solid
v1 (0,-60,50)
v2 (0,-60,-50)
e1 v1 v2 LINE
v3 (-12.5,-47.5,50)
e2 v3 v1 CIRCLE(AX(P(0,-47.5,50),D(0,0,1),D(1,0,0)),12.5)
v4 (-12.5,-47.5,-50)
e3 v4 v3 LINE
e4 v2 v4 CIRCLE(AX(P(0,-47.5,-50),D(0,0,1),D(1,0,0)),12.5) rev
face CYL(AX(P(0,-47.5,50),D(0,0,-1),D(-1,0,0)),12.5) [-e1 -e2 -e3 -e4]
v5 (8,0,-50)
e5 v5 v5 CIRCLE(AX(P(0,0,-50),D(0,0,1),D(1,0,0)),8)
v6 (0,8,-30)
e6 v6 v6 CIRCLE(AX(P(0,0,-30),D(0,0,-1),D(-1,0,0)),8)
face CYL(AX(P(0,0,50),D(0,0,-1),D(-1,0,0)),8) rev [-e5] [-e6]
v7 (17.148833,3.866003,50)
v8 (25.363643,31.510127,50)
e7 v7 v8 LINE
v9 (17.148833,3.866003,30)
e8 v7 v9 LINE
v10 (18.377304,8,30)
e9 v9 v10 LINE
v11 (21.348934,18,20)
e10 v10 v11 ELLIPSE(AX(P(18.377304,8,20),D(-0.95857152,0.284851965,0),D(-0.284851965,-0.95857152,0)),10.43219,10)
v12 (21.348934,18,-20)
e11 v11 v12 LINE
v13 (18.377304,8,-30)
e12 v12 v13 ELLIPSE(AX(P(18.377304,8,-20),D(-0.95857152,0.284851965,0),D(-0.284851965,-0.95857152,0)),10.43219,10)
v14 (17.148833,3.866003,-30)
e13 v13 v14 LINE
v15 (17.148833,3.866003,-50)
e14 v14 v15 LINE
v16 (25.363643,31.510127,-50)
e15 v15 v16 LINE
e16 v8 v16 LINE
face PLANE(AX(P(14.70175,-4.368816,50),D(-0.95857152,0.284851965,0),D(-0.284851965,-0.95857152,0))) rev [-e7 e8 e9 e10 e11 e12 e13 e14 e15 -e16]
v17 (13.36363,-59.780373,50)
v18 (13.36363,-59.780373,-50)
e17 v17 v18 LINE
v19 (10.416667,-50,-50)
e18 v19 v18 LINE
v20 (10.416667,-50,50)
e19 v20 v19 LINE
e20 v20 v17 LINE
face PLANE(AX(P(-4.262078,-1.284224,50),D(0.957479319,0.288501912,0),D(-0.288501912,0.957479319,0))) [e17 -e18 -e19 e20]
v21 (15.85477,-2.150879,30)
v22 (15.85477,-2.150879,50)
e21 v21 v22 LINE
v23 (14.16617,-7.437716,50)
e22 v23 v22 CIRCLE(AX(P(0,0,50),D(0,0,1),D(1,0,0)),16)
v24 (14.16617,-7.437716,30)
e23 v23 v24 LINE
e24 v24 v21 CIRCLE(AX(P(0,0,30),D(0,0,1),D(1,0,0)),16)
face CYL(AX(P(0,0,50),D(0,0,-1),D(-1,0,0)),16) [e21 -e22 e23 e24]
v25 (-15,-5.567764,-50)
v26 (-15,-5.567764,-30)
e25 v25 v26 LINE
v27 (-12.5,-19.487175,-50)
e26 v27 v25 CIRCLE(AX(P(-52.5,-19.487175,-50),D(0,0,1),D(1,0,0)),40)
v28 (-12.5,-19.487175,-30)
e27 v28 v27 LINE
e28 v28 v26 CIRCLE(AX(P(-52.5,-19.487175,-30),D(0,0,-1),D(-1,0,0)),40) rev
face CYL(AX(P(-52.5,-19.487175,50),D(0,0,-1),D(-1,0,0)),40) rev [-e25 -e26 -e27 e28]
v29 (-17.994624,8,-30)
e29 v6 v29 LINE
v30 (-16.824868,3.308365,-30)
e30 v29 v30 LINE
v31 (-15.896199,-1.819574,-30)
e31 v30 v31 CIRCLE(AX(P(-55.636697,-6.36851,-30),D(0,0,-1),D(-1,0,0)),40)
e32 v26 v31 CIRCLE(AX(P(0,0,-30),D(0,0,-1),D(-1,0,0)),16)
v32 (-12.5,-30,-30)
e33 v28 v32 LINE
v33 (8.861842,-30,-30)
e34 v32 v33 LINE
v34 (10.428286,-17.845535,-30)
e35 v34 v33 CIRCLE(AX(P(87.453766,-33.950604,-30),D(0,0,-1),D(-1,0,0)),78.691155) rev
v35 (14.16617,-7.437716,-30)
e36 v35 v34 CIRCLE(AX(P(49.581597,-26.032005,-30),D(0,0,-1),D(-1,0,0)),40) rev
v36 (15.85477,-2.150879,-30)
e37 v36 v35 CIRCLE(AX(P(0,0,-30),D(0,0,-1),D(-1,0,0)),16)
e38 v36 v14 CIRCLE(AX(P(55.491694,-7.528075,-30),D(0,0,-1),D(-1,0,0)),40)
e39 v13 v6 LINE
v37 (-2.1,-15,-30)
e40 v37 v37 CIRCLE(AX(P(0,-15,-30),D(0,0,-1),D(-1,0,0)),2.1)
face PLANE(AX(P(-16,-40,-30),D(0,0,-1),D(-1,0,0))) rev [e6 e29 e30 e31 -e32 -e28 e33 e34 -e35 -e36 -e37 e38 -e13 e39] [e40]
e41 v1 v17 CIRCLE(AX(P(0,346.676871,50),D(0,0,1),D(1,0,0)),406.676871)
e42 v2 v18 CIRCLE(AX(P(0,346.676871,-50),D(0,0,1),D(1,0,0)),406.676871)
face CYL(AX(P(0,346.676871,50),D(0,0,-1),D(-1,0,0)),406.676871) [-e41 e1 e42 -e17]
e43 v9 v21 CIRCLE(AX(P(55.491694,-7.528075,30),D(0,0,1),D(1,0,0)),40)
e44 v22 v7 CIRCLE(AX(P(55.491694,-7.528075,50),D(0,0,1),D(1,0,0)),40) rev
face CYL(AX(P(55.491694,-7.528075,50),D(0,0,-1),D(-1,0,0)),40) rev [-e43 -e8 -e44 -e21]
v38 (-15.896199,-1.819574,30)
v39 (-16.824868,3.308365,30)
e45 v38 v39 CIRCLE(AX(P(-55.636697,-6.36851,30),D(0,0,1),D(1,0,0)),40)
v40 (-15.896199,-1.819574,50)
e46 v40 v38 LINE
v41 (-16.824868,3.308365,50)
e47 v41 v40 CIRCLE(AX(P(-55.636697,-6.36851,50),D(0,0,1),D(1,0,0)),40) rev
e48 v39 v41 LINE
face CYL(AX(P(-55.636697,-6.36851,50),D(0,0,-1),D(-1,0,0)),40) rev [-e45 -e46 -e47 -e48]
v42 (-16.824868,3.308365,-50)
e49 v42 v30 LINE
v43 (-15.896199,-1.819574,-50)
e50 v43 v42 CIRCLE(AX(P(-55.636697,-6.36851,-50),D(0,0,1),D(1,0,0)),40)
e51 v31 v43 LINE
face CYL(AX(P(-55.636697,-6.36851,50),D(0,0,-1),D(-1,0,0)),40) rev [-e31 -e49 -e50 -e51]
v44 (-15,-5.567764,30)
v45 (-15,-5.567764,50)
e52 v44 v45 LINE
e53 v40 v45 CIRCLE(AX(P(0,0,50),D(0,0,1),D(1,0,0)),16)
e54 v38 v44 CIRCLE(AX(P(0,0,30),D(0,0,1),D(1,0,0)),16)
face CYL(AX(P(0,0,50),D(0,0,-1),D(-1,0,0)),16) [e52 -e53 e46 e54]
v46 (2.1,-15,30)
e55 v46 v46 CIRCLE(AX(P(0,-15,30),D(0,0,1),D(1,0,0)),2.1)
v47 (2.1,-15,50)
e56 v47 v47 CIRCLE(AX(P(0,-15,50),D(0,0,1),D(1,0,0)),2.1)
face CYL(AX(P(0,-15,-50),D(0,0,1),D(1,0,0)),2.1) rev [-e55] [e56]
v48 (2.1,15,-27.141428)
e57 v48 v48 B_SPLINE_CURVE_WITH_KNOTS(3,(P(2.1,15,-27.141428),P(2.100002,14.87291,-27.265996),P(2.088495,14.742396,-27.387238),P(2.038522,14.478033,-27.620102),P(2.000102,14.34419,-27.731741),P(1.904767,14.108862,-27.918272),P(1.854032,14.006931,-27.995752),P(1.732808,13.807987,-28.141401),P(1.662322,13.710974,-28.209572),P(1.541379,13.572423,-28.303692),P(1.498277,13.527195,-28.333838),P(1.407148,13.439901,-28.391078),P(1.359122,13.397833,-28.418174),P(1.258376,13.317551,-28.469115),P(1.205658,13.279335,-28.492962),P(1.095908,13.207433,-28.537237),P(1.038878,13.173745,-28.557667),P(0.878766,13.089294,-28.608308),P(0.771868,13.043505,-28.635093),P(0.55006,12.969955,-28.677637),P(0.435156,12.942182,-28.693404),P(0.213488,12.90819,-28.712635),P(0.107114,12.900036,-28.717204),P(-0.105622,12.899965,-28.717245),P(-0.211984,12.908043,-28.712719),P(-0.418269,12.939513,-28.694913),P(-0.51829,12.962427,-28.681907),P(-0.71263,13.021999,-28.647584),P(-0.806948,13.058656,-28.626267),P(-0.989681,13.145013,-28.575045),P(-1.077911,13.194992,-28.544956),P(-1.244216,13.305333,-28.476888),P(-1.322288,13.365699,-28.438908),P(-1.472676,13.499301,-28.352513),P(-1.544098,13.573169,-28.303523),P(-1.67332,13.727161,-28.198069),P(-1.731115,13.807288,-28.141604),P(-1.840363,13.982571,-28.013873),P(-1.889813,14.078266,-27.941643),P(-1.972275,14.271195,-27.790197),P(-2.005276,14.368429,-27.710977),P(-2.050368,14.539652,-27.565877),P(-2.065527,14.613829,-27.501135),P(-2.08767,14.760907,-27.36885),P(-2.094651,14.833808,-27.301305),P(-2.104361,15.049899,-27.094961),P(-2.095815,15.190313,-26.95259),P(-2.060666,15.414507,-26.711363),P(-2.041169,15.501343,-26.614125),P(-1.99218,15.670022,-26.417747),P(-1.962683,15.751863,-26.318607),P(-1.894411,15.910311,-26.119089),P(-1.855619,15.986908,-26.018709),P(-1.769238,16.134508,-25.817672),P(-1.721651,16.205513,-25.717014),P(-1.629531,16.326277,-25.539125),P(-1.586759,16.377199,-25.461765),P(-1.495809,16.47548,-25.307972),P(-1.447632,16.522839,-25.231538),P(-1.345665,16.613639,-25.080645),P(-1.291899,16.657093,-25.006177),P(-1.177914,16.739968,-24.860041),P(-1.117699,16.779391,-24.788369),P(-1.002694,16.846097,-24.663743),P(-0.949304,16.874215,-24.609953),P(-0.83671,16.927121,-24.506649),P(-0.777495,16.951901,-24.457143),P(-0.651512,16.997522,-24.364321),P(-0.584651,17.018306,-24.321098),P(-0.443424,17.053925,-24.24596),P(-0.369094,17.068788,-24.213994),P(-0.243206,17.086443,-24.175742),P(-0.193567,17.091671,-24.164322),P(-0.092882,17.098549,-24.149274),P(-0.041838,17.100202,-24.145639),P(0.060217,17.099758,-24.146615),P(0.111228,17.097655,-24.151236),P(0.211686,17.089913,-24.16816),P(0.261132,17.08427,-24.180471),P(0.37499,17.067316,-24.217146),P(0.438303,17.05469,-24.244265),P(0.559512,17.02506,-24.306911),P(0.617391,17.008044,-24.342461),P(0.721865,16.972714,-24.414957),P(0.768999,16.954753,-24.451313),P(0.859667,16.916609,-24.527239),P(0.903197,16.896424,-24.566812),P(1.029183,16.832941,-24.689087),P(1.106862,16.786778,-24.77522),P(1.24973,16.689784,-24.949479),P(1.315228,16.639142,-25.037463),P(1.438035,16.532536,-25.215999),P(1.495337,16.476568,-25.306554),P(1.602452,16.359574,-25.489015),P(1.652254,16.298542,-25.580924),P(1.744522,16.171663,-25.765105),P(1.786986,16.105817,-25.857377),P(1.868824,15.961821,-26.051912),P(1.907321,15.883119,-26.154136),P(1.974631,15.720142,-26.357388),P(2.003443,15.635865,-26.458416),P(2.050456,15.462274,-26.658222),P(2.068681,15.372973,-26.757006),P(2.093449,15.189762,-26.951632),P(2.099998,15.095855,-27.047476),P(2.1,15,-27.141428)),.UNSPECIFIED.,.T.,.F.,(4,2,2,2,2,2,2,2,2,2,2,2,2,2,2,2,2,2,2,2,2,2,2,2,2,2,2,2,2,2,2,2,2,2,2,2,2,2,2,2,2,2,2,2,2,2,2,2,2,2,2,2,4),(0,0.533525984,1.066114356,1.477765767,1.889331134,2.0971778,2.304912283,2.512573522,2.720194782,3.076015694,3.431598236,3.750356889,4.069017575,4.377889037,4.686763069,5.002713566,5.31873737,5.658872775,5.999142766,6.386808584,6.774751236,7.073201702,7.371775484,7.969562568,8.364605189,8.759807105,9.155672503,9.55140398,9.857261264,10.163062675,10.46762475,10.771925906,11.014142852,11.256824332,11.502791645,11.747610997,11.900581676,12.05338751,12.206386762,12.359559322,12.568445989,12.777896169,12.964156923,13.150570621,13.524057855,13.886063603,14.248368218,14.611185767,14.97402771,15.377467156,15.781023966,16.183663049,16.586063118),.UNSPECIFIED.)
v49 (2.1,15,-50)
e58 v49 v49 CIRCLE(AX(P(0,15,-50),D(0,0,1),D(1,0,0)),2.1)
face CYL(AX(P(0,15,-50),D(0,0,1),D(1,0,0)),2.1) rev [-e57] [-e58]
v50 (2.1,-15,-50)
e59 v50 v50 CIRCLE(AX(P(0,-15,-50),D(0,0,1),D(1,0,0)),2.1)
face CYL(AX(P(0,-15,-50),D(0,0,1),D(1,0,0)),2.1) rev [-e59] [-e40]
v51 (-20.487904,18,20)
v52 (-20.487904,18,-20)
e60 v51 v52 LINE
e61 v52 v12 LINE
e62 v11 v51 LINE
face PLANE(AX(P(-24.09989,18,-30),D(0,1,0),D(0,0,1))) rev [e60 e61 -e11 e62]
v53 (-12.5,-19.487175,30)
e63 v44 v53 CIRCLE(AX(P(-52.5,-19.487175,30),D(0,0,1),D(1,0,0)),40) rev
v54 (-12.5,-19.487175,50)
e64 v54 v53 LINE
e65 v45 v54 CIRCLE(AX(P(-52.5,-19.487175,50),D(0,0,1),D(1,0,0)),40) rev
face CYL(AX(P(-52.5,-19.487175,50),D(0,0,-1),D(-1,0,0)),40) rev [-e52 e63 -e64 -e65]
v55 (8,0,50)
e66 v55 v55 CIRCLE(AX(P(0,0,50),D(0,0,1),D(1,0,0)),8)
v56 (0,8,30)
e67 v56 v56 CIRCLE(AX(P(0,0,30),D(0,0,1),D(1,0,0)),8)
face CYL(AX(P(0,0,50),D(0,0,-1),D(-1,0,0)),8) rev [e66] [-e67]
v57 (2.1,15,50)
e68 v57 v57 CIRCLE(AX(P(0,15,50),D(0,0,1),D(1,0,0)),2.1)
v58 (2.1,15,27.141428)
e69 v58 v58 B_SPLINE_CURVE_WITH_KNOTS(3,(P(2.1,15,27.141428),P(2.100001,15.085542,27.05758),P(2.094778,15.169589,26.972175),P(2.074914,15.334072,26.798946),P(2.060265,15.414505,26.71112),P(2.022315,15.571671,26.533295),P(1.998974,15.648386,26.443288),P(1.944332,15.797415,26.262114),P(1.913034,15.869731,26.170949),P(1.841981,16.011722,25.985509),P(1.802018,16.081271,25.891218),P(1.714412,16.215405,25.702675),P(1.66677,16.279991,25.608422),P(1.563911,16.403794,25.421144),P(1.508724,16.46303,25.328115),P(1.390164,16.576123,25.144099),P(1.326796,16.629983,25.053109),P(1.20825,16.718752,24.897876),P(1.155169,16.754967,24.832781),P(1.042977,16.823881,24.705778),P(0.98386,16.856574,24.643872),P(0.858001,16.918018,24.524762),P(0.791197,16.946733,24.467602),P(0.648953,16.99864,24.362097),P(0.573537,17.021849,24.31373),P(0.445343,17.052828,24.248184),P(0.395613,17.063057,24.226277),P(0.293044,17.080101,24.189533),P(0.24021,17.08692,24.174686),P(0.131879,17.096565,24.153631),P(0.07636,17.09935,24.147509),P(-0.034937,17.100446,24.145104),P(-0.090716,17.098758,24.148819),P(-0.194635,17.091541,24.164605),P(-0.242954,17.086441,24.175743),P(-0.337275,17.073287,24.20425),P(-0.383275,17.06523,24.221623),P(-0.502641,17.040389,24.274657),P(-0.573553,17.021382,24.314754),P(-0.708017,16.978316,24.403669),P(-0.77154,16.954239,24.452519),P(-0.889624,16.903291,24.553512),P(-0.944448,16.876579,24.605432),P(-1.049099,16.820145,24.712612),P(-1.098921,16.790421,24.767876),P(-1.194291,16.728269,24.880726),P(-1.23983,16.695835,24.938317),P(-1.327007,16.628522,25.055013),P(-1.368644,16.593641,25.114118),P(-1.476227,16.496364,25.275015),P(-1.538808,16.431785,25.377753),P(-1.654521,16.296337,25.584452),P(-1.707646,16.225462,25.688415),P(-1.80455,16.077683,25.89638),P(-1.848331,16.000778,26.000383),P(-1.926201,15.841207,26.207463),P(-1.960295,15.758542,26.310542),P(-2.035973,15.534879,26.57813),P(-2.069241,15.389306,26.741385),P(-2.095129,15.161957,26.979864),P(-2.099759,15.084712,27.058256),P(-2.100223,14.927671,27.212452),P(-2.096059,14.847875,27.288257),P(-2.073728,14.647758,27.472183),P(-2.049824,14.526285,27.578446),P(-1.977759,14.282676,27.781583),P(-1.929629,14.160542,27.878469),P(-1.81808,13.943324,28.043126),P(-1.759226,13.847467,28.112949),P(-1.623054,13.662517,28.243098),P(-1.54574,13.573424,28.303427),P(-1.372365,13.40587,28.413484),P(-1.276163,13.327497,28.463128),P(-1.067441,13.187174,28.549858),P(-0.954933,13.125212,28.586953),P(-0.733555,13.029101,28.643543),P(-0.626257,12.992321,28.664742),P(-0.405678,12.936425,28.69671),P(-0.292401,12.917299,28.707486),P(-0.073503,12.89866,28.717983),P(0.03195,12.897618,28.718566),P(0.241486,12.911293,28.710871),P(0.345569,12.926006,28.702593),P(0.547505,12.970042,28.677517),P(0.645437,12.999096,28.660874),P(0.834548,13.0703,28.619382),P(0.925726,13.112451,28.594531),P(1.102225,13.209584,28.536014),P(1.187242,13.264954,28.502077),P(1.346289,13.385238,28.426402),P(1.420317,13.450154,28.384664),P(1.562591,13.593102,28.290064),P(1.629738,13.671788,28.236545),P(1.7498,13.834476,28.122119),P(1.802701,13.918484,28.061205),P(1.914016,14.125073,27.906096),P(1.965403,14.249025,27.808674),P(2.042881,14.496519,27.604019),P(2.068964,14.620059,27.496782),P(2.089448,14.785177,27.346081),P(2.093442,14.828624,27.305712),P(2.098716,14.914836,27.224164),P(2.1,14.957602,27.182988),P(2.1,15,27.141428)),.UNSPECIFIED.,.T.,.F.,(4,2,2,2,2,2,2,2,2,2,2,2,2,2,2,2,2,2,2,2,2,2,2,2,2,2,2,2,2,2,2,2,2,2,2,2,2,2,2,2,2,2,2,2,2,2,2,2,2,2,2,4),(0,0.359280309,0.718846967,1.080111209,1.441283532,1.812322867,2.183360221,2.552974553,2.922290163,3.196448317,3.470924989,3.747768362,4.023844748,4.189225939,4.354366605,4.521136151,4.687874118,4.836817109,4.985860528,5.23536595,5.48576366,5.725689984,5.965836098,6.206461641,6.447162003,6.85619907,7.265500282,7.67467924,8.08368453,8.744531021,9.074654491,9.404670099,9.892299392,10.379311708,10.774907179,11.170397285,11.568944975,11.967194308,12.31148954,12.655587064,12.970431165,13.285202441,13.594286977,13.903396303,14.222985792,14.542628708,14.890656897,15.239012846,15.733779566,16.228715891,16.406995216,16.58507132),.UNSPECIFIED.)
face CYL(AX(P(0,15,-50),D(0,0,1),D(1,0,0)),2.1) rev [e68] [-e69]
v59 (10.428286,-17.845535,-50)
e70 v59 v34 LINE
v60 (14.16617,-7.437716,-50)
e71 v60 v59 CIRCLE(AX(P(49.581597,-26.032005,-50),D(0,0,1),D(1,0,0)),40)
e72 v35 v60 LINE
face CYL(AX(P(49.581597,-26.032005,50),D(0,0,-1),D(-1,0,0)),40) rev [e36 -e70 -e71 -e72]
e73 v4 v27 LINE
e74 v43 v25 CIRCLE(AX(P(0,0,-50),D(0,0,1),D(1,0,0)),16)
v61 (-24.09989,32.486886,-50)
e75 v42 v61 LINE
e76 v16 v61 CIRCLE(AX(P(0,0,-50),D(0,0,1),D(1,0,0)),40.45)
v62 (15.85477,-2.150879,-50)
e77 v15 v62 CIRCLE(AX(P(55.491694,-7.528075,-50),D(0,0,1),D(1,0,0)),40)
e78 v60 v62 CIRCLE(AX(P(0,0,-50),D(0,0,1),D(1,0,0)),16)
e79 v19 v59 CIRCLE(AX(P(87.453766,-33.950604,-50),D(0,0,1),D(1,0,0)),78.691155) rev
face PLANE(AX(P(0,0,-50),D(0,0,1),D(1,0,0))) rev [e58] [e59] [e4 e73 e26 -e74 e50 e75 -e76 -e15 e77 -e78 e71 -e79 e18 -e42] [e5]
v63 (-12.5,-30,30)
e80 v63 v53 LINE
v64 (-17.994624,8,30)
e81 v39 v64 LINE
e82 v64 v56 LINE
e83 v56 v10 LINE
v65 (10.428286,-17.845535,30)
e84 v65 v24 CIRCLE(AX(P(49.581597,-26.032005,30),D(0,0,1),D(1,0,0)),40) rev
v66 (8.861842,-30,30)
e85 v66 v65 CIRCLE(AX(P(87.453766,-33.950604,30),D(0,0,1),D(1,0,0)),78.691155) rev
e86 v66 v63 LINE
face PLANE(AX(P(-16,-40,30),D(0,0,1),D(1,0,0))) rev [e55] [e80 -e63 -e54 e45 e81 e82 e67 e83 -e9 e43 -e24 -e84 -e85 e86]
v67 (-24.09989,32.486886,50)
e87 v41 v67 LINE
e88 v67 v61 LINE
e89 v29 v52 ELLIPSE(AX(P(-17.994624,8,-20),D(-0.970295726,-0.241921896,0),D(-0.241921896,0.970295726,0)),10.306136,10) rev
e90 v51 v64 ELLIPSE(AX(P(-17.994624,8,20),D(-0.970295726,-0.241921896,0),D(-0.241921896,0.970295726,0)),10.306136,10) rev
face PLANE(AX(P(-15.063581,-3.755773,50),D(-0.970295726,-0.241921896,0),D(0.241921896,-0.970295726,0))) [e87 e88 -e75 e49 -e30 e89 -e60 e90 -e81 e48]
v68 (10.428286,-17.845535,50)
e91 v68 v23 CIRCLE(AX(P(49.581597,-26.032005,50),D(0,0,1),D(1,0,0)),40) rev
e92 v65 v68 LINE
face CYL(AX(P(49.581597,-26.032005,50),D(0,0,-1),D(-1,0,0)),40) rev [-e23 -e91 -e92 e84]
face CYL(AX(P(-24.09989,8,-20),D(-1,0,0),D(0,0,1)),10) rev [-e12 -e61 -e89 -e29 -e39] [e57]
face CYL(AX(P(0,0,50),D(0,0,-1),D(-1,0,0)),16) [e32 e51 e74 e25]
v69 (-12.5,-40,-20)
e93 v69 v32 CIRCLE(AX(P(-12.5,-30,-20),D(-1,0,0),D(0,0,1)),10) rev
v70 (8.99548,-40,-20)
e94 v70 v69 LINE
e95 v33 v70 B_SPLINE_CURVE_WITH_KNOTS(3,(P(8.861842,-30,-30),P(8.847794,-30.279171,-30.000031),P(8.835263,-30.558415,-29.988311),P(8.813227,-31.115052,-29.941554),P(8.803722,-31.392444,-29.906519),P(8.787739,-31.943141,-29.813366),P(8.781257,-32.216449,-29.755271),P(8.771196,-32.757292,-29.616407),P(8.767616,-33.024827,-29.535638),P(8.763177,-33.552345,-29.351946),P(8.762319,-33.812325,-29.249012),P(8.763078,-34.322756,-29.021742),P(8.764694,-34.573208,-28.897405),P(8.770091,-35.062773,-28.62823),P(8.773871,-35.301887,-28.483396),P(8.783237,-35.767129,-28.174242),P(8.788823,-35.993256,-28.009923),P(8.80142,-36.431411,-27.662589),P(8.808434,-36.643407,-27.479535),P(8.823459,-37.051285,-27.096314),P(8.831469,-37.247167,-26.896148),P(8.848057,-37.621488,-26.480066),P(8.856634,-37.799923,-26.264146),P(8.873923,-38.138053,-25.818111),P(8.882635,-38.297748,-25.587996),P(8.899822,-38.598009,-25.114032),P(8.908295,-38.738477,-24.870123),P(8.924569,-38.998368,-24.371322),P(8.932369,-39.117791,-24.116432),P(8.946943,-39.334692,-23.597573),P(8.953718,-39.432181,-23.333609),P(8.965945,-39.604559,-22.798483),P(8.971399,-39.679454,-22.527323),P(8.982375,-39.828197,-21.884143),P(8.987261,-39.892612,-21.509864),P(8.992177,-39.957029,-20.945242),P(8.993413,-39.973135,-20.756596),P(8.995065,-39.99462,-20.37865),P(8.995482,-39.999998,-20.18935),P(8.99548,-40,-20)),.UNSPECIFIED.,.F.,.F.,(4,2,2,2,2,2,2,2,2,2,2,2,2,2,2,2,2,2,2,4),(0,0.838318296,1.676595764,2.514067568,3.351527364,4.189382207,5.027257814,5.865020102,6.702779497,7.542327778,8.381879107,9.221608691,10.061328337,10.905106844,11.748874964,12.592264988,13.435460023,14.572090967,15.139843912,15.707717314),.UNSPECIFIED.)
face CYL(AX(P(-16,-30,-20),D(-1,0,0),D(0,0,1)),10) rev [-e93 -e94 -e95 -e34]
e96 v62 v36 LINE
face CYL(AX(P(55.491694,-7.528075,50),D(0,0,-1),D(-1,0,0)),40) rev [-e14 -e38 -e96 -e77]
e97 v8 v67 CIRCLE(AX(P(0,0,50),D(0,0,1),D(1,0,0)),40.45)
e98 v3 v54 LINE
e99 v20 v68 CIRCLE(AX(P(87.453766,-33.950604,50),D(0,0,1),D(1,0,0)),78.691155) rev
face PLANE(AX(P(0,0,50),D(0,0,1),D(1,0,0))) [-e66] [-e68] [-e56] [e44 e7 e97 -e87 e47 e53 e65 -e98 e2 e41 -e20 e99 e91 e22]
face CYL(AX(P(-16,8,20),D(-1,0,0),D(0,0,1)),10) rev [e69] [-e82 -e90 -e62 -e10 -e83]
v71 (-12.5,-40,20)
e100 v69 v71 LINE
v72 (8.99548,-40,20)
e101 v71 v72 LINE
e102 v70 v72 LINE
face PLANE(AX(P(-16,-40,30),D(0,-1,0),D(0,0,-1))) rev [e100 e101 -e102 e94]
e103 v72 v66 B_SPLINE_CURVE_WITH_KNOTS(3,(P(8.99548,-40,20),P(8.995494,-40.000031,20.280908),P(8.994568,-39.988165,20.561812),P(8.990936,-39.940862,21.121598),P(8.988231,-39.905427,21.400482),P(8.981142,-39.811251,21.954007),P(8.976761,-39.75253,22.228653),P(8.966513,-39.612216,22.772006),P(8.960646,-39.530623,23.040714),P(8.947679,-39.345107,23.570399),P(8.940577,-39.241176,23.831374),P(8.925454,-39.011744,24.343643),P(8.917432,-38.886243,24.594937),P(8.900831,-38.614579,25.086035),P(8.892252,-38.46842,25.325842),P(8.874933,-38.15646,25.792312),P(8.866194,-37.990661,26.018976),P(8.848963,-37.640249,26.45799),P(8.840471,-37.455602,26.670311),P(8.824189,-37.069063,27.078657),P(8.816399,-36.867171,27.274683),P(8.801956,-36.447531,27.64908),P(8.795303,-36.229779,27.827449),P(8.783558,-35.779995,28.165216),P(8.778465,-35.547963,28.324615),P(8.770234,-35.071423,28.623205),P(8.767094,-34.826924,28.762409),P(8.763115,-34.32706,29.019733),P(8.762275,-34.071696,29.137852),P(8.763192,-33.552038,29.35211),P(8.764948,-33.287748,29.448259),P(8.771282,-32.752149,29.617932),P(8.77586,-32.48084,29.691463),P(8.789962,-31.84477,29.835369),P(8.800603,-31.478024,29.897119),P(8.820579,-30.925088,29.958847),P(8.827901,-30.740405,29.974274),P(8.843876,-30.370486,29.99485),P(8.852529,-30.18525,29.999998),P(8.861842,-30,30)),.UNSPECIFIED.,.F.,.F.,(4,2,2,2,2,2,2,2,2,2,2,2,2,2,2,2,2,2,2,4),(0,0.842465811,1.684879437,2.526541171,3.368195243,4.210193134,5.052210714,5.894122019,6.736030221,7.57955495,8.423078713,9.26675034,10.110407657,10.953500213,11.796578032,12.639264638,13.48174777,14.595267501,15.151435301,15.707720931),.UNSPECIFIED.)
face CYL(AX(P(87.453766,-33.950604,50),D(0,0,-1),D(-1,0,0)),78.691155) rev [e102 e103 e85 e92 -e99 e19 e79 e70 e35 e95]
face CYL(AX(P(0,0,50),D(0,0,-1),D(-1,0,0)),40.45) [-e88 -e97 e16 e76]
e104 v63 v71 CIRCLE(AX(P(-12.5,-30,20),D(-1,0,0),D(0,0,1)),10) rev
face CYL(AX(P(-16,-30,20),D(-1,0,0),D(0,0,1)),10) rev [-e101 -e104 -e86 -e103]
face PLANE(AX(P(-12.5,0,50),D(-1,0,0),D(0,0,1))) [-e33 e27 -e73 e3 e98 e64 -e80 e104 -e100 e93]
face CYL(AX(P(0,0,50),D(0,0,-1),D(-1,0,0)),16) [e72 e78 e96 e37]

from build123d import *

# Parameters (mm, degrees)
BOSS_EXTRUDE1_DEPTH     = 50
FILLET1_R               = 12.5
FILLET2_R               = 40
CUT_EXTRUDE1_DEPTH      = 80.72452587
CUT_EXTRUDE1_DEPTH_BACK = 80.72452587
SKETCH7_W               = 60
SKETCH7_H               = 40
FILLET3_R               = 10
BOSS_EXTRUDE2_DEPTH     = 50
FILLET5_R               = 40
CUT_EXTRUDE2_DEPTH      = 83.117686393
CUT_EXTRUDE2_DEPTH_BACK = 83.117686393
SKETCH9_W               = 60
SKETCH9_H               = 18
FILLET4_R               = 10
CUT_EXTRUDE3_DEPTH      = 120.345357801
CUT_EXTRUDE3_DEPTH_BACK = 120.345357801
SKETCH10_R              = 2.1


with BuildPart() as part:
    # Sketch4 → Boss-Extrude1 (new, symmetric)
    with BuildSketch(Plane.XY):
        with BuildLine():
            ThreePointArc((8, 0), (0, -8), (-8, 0))
            Line((-8, 0), (-16, 0))
            ThreePointArc((-16, 0), (-15.099668871, -5.291502622), (-12.5, -9.987492178))
            Line((-12.5, -9.987492178), (-12.5, -58.683472972))
            ThreePointArc((-12.5, -58.683472972), (-6.284569266, -59.669960526), (0, -60))
            ThreePointArc((0, -60), (6.682717176, -59.945089422), (13.363629715, -59.780372517))
            Line((13.363629715, -59.780372517), (10.416666667, -50))
            ThreePointArc((10.416666667, -50), (8.869060232, -29.858930271), (12.5, -9.987492178))
            ThreePointArc((12.5, -9.987492178), (15.099668871, -5.291502622), (16, 0))
            Line((16, 0), (8, 0))
        make_face()
    extrude(amount=BOSS_EXTRUDE1_DEPTH, both=True)

    # Fillet1
    fillet1_edges = [part.edges().sort_by_distance(p)[0] for p in [
        (-12.5, -58.683472972, 0),
    ]]
    fillet(fillet1_edges, radius=FILLET1_R - 0.0001)  # a hair under: the kernel refuses the full size

    # Fillet2
    fillet2_edges = [part.edges().sort_by_distance(p)[0] for p in [
        (-12.5, -9.987492178, 0),
        (12.5, -9.987492178, 0),
    ]]
    fillet(fillet2_edges, radius=FILLET2_R)

    # Sketch7 → Cut-Extrude1 (cut, two sides: drawn at the far end of the back side and taken through both)
    with BuildSketch(Plane(origin=(0, 0, 0), x_dir=(0, 0, -1), z_dir=(1, 0, 0)).offset(-CUT_EXTRUDE1_DEPTH_BACK)):
        with Locations((0, -20)):
            Rectangle(SKETCH7_W, SKETCH7_H)
    extrude(amount=CUT_EXTRUDE1_DEPTH + CUT_EXTRUDE1_DEPTH_BACK, mode=Mode.SUBTRACT)

    # Fillet3
    fillet3_edges = [part.edges().sort_by_distance(p)[0] for p in [
        (-1.752259827, -40, -30),
        (-1.752259827, -40, 30),
    ]]
    fillet(fillet3_edges, radius=FILLET3_R)

    # Sketch8 → Boss-Extrude2 (add, symmetric)
    with BuildSketch(Plane.XY):
        with BuildLine():
            Line((8, 0), (16, 0))
            ThreePointArc((16, 0), (0, 16), (-16, 0))
            Line((-16, 0), (-8, 0))
            ThreePointArc((-8, 0), (0, 8), (8, 0))
        make_face()
        with BuildLine():
            ThreePointArc((-16, 0), (0, 16), (16, 0))
            Line((16, 0), (16, 37.1510767))
            ThreePointArc((16, 37.1510767), (-4.673406093, 40.179121139), (-24.099890471, 32.486886266))
            Line((-24.099890471, 32.486886266), (-16, 0))
        make_face()
        with BuildLine():
            Line((16, 37.1510767), (16, 0))
            Line((16, 0), (25.363643105, 31.510127078))
            ThreePointArc((25.363643105, 31.510127078), (20.873256116, 34.648371955), (16, 37.1510767))
        make_face()
    extrude(amount=BOSS_EXTRUDE2_DEPTH, both=True)

    # Fillet5
    fillet5_edges = [part.edges().sort_by_distance(p)[0] for p in [
        (-16, 0, 40),
        (16, 0, 40),
        (-16, 0, -40),
        (16, 0, -40),
    ]]
    fillet(fillet5_edges, radius=FILLET5_R)

    # Sketch9 → Cut-Extrude2 (cut, two sides: drawn at the far end of the back side and taken through both)
    with BuildSketch(Plane(origin=(0, 0, 0), x_dir=(0, 0, -1), z_dir=(1, 0, 0)).offset(-CUT_EXTRUDE2_DEPTH_BACK)):
        with Locations((0, 9)):
            Rectangle(SKETCH9_W, SKETCH9_H)
    extrude(amount=CUT_EXTRUDE2_DEPTH + CUT_EXTRUDE2_DEPTH_BACK, mode=Mode.SUBTRACT)

    # Fillet4
    fillet4_edges = [part.edges().sort_by_distance(p)[0] for p in [
        (0.430514749, 18, 30),
        (0.430514749, 18, -30),
    ]]
    fillet(fillet4_edges, radius=FILLET4_R - 0.0001)  # a hair under: the kernel refuses the full size

    # Sketch10 → Cut-Extrude3 (cut, two sides: drawn at the far end of the back side and taken through both)
    with BuildSketch(Plane.XY.offset(50).offset(-CUT_EXTRUDE3_DEPTH_BACK)):
        with Locations((0, 15)):
            Circle(SKETCH10_R)
        with Locations((0, -15)):
            Circle(SKETCH10_R)
    extrude(amount=CUT_EXTRUDE3_DEPTH + CUT_EXTRUDE3_DEPTH_BACK, mode=Mode.SUBTRACT)


solid = part.part
